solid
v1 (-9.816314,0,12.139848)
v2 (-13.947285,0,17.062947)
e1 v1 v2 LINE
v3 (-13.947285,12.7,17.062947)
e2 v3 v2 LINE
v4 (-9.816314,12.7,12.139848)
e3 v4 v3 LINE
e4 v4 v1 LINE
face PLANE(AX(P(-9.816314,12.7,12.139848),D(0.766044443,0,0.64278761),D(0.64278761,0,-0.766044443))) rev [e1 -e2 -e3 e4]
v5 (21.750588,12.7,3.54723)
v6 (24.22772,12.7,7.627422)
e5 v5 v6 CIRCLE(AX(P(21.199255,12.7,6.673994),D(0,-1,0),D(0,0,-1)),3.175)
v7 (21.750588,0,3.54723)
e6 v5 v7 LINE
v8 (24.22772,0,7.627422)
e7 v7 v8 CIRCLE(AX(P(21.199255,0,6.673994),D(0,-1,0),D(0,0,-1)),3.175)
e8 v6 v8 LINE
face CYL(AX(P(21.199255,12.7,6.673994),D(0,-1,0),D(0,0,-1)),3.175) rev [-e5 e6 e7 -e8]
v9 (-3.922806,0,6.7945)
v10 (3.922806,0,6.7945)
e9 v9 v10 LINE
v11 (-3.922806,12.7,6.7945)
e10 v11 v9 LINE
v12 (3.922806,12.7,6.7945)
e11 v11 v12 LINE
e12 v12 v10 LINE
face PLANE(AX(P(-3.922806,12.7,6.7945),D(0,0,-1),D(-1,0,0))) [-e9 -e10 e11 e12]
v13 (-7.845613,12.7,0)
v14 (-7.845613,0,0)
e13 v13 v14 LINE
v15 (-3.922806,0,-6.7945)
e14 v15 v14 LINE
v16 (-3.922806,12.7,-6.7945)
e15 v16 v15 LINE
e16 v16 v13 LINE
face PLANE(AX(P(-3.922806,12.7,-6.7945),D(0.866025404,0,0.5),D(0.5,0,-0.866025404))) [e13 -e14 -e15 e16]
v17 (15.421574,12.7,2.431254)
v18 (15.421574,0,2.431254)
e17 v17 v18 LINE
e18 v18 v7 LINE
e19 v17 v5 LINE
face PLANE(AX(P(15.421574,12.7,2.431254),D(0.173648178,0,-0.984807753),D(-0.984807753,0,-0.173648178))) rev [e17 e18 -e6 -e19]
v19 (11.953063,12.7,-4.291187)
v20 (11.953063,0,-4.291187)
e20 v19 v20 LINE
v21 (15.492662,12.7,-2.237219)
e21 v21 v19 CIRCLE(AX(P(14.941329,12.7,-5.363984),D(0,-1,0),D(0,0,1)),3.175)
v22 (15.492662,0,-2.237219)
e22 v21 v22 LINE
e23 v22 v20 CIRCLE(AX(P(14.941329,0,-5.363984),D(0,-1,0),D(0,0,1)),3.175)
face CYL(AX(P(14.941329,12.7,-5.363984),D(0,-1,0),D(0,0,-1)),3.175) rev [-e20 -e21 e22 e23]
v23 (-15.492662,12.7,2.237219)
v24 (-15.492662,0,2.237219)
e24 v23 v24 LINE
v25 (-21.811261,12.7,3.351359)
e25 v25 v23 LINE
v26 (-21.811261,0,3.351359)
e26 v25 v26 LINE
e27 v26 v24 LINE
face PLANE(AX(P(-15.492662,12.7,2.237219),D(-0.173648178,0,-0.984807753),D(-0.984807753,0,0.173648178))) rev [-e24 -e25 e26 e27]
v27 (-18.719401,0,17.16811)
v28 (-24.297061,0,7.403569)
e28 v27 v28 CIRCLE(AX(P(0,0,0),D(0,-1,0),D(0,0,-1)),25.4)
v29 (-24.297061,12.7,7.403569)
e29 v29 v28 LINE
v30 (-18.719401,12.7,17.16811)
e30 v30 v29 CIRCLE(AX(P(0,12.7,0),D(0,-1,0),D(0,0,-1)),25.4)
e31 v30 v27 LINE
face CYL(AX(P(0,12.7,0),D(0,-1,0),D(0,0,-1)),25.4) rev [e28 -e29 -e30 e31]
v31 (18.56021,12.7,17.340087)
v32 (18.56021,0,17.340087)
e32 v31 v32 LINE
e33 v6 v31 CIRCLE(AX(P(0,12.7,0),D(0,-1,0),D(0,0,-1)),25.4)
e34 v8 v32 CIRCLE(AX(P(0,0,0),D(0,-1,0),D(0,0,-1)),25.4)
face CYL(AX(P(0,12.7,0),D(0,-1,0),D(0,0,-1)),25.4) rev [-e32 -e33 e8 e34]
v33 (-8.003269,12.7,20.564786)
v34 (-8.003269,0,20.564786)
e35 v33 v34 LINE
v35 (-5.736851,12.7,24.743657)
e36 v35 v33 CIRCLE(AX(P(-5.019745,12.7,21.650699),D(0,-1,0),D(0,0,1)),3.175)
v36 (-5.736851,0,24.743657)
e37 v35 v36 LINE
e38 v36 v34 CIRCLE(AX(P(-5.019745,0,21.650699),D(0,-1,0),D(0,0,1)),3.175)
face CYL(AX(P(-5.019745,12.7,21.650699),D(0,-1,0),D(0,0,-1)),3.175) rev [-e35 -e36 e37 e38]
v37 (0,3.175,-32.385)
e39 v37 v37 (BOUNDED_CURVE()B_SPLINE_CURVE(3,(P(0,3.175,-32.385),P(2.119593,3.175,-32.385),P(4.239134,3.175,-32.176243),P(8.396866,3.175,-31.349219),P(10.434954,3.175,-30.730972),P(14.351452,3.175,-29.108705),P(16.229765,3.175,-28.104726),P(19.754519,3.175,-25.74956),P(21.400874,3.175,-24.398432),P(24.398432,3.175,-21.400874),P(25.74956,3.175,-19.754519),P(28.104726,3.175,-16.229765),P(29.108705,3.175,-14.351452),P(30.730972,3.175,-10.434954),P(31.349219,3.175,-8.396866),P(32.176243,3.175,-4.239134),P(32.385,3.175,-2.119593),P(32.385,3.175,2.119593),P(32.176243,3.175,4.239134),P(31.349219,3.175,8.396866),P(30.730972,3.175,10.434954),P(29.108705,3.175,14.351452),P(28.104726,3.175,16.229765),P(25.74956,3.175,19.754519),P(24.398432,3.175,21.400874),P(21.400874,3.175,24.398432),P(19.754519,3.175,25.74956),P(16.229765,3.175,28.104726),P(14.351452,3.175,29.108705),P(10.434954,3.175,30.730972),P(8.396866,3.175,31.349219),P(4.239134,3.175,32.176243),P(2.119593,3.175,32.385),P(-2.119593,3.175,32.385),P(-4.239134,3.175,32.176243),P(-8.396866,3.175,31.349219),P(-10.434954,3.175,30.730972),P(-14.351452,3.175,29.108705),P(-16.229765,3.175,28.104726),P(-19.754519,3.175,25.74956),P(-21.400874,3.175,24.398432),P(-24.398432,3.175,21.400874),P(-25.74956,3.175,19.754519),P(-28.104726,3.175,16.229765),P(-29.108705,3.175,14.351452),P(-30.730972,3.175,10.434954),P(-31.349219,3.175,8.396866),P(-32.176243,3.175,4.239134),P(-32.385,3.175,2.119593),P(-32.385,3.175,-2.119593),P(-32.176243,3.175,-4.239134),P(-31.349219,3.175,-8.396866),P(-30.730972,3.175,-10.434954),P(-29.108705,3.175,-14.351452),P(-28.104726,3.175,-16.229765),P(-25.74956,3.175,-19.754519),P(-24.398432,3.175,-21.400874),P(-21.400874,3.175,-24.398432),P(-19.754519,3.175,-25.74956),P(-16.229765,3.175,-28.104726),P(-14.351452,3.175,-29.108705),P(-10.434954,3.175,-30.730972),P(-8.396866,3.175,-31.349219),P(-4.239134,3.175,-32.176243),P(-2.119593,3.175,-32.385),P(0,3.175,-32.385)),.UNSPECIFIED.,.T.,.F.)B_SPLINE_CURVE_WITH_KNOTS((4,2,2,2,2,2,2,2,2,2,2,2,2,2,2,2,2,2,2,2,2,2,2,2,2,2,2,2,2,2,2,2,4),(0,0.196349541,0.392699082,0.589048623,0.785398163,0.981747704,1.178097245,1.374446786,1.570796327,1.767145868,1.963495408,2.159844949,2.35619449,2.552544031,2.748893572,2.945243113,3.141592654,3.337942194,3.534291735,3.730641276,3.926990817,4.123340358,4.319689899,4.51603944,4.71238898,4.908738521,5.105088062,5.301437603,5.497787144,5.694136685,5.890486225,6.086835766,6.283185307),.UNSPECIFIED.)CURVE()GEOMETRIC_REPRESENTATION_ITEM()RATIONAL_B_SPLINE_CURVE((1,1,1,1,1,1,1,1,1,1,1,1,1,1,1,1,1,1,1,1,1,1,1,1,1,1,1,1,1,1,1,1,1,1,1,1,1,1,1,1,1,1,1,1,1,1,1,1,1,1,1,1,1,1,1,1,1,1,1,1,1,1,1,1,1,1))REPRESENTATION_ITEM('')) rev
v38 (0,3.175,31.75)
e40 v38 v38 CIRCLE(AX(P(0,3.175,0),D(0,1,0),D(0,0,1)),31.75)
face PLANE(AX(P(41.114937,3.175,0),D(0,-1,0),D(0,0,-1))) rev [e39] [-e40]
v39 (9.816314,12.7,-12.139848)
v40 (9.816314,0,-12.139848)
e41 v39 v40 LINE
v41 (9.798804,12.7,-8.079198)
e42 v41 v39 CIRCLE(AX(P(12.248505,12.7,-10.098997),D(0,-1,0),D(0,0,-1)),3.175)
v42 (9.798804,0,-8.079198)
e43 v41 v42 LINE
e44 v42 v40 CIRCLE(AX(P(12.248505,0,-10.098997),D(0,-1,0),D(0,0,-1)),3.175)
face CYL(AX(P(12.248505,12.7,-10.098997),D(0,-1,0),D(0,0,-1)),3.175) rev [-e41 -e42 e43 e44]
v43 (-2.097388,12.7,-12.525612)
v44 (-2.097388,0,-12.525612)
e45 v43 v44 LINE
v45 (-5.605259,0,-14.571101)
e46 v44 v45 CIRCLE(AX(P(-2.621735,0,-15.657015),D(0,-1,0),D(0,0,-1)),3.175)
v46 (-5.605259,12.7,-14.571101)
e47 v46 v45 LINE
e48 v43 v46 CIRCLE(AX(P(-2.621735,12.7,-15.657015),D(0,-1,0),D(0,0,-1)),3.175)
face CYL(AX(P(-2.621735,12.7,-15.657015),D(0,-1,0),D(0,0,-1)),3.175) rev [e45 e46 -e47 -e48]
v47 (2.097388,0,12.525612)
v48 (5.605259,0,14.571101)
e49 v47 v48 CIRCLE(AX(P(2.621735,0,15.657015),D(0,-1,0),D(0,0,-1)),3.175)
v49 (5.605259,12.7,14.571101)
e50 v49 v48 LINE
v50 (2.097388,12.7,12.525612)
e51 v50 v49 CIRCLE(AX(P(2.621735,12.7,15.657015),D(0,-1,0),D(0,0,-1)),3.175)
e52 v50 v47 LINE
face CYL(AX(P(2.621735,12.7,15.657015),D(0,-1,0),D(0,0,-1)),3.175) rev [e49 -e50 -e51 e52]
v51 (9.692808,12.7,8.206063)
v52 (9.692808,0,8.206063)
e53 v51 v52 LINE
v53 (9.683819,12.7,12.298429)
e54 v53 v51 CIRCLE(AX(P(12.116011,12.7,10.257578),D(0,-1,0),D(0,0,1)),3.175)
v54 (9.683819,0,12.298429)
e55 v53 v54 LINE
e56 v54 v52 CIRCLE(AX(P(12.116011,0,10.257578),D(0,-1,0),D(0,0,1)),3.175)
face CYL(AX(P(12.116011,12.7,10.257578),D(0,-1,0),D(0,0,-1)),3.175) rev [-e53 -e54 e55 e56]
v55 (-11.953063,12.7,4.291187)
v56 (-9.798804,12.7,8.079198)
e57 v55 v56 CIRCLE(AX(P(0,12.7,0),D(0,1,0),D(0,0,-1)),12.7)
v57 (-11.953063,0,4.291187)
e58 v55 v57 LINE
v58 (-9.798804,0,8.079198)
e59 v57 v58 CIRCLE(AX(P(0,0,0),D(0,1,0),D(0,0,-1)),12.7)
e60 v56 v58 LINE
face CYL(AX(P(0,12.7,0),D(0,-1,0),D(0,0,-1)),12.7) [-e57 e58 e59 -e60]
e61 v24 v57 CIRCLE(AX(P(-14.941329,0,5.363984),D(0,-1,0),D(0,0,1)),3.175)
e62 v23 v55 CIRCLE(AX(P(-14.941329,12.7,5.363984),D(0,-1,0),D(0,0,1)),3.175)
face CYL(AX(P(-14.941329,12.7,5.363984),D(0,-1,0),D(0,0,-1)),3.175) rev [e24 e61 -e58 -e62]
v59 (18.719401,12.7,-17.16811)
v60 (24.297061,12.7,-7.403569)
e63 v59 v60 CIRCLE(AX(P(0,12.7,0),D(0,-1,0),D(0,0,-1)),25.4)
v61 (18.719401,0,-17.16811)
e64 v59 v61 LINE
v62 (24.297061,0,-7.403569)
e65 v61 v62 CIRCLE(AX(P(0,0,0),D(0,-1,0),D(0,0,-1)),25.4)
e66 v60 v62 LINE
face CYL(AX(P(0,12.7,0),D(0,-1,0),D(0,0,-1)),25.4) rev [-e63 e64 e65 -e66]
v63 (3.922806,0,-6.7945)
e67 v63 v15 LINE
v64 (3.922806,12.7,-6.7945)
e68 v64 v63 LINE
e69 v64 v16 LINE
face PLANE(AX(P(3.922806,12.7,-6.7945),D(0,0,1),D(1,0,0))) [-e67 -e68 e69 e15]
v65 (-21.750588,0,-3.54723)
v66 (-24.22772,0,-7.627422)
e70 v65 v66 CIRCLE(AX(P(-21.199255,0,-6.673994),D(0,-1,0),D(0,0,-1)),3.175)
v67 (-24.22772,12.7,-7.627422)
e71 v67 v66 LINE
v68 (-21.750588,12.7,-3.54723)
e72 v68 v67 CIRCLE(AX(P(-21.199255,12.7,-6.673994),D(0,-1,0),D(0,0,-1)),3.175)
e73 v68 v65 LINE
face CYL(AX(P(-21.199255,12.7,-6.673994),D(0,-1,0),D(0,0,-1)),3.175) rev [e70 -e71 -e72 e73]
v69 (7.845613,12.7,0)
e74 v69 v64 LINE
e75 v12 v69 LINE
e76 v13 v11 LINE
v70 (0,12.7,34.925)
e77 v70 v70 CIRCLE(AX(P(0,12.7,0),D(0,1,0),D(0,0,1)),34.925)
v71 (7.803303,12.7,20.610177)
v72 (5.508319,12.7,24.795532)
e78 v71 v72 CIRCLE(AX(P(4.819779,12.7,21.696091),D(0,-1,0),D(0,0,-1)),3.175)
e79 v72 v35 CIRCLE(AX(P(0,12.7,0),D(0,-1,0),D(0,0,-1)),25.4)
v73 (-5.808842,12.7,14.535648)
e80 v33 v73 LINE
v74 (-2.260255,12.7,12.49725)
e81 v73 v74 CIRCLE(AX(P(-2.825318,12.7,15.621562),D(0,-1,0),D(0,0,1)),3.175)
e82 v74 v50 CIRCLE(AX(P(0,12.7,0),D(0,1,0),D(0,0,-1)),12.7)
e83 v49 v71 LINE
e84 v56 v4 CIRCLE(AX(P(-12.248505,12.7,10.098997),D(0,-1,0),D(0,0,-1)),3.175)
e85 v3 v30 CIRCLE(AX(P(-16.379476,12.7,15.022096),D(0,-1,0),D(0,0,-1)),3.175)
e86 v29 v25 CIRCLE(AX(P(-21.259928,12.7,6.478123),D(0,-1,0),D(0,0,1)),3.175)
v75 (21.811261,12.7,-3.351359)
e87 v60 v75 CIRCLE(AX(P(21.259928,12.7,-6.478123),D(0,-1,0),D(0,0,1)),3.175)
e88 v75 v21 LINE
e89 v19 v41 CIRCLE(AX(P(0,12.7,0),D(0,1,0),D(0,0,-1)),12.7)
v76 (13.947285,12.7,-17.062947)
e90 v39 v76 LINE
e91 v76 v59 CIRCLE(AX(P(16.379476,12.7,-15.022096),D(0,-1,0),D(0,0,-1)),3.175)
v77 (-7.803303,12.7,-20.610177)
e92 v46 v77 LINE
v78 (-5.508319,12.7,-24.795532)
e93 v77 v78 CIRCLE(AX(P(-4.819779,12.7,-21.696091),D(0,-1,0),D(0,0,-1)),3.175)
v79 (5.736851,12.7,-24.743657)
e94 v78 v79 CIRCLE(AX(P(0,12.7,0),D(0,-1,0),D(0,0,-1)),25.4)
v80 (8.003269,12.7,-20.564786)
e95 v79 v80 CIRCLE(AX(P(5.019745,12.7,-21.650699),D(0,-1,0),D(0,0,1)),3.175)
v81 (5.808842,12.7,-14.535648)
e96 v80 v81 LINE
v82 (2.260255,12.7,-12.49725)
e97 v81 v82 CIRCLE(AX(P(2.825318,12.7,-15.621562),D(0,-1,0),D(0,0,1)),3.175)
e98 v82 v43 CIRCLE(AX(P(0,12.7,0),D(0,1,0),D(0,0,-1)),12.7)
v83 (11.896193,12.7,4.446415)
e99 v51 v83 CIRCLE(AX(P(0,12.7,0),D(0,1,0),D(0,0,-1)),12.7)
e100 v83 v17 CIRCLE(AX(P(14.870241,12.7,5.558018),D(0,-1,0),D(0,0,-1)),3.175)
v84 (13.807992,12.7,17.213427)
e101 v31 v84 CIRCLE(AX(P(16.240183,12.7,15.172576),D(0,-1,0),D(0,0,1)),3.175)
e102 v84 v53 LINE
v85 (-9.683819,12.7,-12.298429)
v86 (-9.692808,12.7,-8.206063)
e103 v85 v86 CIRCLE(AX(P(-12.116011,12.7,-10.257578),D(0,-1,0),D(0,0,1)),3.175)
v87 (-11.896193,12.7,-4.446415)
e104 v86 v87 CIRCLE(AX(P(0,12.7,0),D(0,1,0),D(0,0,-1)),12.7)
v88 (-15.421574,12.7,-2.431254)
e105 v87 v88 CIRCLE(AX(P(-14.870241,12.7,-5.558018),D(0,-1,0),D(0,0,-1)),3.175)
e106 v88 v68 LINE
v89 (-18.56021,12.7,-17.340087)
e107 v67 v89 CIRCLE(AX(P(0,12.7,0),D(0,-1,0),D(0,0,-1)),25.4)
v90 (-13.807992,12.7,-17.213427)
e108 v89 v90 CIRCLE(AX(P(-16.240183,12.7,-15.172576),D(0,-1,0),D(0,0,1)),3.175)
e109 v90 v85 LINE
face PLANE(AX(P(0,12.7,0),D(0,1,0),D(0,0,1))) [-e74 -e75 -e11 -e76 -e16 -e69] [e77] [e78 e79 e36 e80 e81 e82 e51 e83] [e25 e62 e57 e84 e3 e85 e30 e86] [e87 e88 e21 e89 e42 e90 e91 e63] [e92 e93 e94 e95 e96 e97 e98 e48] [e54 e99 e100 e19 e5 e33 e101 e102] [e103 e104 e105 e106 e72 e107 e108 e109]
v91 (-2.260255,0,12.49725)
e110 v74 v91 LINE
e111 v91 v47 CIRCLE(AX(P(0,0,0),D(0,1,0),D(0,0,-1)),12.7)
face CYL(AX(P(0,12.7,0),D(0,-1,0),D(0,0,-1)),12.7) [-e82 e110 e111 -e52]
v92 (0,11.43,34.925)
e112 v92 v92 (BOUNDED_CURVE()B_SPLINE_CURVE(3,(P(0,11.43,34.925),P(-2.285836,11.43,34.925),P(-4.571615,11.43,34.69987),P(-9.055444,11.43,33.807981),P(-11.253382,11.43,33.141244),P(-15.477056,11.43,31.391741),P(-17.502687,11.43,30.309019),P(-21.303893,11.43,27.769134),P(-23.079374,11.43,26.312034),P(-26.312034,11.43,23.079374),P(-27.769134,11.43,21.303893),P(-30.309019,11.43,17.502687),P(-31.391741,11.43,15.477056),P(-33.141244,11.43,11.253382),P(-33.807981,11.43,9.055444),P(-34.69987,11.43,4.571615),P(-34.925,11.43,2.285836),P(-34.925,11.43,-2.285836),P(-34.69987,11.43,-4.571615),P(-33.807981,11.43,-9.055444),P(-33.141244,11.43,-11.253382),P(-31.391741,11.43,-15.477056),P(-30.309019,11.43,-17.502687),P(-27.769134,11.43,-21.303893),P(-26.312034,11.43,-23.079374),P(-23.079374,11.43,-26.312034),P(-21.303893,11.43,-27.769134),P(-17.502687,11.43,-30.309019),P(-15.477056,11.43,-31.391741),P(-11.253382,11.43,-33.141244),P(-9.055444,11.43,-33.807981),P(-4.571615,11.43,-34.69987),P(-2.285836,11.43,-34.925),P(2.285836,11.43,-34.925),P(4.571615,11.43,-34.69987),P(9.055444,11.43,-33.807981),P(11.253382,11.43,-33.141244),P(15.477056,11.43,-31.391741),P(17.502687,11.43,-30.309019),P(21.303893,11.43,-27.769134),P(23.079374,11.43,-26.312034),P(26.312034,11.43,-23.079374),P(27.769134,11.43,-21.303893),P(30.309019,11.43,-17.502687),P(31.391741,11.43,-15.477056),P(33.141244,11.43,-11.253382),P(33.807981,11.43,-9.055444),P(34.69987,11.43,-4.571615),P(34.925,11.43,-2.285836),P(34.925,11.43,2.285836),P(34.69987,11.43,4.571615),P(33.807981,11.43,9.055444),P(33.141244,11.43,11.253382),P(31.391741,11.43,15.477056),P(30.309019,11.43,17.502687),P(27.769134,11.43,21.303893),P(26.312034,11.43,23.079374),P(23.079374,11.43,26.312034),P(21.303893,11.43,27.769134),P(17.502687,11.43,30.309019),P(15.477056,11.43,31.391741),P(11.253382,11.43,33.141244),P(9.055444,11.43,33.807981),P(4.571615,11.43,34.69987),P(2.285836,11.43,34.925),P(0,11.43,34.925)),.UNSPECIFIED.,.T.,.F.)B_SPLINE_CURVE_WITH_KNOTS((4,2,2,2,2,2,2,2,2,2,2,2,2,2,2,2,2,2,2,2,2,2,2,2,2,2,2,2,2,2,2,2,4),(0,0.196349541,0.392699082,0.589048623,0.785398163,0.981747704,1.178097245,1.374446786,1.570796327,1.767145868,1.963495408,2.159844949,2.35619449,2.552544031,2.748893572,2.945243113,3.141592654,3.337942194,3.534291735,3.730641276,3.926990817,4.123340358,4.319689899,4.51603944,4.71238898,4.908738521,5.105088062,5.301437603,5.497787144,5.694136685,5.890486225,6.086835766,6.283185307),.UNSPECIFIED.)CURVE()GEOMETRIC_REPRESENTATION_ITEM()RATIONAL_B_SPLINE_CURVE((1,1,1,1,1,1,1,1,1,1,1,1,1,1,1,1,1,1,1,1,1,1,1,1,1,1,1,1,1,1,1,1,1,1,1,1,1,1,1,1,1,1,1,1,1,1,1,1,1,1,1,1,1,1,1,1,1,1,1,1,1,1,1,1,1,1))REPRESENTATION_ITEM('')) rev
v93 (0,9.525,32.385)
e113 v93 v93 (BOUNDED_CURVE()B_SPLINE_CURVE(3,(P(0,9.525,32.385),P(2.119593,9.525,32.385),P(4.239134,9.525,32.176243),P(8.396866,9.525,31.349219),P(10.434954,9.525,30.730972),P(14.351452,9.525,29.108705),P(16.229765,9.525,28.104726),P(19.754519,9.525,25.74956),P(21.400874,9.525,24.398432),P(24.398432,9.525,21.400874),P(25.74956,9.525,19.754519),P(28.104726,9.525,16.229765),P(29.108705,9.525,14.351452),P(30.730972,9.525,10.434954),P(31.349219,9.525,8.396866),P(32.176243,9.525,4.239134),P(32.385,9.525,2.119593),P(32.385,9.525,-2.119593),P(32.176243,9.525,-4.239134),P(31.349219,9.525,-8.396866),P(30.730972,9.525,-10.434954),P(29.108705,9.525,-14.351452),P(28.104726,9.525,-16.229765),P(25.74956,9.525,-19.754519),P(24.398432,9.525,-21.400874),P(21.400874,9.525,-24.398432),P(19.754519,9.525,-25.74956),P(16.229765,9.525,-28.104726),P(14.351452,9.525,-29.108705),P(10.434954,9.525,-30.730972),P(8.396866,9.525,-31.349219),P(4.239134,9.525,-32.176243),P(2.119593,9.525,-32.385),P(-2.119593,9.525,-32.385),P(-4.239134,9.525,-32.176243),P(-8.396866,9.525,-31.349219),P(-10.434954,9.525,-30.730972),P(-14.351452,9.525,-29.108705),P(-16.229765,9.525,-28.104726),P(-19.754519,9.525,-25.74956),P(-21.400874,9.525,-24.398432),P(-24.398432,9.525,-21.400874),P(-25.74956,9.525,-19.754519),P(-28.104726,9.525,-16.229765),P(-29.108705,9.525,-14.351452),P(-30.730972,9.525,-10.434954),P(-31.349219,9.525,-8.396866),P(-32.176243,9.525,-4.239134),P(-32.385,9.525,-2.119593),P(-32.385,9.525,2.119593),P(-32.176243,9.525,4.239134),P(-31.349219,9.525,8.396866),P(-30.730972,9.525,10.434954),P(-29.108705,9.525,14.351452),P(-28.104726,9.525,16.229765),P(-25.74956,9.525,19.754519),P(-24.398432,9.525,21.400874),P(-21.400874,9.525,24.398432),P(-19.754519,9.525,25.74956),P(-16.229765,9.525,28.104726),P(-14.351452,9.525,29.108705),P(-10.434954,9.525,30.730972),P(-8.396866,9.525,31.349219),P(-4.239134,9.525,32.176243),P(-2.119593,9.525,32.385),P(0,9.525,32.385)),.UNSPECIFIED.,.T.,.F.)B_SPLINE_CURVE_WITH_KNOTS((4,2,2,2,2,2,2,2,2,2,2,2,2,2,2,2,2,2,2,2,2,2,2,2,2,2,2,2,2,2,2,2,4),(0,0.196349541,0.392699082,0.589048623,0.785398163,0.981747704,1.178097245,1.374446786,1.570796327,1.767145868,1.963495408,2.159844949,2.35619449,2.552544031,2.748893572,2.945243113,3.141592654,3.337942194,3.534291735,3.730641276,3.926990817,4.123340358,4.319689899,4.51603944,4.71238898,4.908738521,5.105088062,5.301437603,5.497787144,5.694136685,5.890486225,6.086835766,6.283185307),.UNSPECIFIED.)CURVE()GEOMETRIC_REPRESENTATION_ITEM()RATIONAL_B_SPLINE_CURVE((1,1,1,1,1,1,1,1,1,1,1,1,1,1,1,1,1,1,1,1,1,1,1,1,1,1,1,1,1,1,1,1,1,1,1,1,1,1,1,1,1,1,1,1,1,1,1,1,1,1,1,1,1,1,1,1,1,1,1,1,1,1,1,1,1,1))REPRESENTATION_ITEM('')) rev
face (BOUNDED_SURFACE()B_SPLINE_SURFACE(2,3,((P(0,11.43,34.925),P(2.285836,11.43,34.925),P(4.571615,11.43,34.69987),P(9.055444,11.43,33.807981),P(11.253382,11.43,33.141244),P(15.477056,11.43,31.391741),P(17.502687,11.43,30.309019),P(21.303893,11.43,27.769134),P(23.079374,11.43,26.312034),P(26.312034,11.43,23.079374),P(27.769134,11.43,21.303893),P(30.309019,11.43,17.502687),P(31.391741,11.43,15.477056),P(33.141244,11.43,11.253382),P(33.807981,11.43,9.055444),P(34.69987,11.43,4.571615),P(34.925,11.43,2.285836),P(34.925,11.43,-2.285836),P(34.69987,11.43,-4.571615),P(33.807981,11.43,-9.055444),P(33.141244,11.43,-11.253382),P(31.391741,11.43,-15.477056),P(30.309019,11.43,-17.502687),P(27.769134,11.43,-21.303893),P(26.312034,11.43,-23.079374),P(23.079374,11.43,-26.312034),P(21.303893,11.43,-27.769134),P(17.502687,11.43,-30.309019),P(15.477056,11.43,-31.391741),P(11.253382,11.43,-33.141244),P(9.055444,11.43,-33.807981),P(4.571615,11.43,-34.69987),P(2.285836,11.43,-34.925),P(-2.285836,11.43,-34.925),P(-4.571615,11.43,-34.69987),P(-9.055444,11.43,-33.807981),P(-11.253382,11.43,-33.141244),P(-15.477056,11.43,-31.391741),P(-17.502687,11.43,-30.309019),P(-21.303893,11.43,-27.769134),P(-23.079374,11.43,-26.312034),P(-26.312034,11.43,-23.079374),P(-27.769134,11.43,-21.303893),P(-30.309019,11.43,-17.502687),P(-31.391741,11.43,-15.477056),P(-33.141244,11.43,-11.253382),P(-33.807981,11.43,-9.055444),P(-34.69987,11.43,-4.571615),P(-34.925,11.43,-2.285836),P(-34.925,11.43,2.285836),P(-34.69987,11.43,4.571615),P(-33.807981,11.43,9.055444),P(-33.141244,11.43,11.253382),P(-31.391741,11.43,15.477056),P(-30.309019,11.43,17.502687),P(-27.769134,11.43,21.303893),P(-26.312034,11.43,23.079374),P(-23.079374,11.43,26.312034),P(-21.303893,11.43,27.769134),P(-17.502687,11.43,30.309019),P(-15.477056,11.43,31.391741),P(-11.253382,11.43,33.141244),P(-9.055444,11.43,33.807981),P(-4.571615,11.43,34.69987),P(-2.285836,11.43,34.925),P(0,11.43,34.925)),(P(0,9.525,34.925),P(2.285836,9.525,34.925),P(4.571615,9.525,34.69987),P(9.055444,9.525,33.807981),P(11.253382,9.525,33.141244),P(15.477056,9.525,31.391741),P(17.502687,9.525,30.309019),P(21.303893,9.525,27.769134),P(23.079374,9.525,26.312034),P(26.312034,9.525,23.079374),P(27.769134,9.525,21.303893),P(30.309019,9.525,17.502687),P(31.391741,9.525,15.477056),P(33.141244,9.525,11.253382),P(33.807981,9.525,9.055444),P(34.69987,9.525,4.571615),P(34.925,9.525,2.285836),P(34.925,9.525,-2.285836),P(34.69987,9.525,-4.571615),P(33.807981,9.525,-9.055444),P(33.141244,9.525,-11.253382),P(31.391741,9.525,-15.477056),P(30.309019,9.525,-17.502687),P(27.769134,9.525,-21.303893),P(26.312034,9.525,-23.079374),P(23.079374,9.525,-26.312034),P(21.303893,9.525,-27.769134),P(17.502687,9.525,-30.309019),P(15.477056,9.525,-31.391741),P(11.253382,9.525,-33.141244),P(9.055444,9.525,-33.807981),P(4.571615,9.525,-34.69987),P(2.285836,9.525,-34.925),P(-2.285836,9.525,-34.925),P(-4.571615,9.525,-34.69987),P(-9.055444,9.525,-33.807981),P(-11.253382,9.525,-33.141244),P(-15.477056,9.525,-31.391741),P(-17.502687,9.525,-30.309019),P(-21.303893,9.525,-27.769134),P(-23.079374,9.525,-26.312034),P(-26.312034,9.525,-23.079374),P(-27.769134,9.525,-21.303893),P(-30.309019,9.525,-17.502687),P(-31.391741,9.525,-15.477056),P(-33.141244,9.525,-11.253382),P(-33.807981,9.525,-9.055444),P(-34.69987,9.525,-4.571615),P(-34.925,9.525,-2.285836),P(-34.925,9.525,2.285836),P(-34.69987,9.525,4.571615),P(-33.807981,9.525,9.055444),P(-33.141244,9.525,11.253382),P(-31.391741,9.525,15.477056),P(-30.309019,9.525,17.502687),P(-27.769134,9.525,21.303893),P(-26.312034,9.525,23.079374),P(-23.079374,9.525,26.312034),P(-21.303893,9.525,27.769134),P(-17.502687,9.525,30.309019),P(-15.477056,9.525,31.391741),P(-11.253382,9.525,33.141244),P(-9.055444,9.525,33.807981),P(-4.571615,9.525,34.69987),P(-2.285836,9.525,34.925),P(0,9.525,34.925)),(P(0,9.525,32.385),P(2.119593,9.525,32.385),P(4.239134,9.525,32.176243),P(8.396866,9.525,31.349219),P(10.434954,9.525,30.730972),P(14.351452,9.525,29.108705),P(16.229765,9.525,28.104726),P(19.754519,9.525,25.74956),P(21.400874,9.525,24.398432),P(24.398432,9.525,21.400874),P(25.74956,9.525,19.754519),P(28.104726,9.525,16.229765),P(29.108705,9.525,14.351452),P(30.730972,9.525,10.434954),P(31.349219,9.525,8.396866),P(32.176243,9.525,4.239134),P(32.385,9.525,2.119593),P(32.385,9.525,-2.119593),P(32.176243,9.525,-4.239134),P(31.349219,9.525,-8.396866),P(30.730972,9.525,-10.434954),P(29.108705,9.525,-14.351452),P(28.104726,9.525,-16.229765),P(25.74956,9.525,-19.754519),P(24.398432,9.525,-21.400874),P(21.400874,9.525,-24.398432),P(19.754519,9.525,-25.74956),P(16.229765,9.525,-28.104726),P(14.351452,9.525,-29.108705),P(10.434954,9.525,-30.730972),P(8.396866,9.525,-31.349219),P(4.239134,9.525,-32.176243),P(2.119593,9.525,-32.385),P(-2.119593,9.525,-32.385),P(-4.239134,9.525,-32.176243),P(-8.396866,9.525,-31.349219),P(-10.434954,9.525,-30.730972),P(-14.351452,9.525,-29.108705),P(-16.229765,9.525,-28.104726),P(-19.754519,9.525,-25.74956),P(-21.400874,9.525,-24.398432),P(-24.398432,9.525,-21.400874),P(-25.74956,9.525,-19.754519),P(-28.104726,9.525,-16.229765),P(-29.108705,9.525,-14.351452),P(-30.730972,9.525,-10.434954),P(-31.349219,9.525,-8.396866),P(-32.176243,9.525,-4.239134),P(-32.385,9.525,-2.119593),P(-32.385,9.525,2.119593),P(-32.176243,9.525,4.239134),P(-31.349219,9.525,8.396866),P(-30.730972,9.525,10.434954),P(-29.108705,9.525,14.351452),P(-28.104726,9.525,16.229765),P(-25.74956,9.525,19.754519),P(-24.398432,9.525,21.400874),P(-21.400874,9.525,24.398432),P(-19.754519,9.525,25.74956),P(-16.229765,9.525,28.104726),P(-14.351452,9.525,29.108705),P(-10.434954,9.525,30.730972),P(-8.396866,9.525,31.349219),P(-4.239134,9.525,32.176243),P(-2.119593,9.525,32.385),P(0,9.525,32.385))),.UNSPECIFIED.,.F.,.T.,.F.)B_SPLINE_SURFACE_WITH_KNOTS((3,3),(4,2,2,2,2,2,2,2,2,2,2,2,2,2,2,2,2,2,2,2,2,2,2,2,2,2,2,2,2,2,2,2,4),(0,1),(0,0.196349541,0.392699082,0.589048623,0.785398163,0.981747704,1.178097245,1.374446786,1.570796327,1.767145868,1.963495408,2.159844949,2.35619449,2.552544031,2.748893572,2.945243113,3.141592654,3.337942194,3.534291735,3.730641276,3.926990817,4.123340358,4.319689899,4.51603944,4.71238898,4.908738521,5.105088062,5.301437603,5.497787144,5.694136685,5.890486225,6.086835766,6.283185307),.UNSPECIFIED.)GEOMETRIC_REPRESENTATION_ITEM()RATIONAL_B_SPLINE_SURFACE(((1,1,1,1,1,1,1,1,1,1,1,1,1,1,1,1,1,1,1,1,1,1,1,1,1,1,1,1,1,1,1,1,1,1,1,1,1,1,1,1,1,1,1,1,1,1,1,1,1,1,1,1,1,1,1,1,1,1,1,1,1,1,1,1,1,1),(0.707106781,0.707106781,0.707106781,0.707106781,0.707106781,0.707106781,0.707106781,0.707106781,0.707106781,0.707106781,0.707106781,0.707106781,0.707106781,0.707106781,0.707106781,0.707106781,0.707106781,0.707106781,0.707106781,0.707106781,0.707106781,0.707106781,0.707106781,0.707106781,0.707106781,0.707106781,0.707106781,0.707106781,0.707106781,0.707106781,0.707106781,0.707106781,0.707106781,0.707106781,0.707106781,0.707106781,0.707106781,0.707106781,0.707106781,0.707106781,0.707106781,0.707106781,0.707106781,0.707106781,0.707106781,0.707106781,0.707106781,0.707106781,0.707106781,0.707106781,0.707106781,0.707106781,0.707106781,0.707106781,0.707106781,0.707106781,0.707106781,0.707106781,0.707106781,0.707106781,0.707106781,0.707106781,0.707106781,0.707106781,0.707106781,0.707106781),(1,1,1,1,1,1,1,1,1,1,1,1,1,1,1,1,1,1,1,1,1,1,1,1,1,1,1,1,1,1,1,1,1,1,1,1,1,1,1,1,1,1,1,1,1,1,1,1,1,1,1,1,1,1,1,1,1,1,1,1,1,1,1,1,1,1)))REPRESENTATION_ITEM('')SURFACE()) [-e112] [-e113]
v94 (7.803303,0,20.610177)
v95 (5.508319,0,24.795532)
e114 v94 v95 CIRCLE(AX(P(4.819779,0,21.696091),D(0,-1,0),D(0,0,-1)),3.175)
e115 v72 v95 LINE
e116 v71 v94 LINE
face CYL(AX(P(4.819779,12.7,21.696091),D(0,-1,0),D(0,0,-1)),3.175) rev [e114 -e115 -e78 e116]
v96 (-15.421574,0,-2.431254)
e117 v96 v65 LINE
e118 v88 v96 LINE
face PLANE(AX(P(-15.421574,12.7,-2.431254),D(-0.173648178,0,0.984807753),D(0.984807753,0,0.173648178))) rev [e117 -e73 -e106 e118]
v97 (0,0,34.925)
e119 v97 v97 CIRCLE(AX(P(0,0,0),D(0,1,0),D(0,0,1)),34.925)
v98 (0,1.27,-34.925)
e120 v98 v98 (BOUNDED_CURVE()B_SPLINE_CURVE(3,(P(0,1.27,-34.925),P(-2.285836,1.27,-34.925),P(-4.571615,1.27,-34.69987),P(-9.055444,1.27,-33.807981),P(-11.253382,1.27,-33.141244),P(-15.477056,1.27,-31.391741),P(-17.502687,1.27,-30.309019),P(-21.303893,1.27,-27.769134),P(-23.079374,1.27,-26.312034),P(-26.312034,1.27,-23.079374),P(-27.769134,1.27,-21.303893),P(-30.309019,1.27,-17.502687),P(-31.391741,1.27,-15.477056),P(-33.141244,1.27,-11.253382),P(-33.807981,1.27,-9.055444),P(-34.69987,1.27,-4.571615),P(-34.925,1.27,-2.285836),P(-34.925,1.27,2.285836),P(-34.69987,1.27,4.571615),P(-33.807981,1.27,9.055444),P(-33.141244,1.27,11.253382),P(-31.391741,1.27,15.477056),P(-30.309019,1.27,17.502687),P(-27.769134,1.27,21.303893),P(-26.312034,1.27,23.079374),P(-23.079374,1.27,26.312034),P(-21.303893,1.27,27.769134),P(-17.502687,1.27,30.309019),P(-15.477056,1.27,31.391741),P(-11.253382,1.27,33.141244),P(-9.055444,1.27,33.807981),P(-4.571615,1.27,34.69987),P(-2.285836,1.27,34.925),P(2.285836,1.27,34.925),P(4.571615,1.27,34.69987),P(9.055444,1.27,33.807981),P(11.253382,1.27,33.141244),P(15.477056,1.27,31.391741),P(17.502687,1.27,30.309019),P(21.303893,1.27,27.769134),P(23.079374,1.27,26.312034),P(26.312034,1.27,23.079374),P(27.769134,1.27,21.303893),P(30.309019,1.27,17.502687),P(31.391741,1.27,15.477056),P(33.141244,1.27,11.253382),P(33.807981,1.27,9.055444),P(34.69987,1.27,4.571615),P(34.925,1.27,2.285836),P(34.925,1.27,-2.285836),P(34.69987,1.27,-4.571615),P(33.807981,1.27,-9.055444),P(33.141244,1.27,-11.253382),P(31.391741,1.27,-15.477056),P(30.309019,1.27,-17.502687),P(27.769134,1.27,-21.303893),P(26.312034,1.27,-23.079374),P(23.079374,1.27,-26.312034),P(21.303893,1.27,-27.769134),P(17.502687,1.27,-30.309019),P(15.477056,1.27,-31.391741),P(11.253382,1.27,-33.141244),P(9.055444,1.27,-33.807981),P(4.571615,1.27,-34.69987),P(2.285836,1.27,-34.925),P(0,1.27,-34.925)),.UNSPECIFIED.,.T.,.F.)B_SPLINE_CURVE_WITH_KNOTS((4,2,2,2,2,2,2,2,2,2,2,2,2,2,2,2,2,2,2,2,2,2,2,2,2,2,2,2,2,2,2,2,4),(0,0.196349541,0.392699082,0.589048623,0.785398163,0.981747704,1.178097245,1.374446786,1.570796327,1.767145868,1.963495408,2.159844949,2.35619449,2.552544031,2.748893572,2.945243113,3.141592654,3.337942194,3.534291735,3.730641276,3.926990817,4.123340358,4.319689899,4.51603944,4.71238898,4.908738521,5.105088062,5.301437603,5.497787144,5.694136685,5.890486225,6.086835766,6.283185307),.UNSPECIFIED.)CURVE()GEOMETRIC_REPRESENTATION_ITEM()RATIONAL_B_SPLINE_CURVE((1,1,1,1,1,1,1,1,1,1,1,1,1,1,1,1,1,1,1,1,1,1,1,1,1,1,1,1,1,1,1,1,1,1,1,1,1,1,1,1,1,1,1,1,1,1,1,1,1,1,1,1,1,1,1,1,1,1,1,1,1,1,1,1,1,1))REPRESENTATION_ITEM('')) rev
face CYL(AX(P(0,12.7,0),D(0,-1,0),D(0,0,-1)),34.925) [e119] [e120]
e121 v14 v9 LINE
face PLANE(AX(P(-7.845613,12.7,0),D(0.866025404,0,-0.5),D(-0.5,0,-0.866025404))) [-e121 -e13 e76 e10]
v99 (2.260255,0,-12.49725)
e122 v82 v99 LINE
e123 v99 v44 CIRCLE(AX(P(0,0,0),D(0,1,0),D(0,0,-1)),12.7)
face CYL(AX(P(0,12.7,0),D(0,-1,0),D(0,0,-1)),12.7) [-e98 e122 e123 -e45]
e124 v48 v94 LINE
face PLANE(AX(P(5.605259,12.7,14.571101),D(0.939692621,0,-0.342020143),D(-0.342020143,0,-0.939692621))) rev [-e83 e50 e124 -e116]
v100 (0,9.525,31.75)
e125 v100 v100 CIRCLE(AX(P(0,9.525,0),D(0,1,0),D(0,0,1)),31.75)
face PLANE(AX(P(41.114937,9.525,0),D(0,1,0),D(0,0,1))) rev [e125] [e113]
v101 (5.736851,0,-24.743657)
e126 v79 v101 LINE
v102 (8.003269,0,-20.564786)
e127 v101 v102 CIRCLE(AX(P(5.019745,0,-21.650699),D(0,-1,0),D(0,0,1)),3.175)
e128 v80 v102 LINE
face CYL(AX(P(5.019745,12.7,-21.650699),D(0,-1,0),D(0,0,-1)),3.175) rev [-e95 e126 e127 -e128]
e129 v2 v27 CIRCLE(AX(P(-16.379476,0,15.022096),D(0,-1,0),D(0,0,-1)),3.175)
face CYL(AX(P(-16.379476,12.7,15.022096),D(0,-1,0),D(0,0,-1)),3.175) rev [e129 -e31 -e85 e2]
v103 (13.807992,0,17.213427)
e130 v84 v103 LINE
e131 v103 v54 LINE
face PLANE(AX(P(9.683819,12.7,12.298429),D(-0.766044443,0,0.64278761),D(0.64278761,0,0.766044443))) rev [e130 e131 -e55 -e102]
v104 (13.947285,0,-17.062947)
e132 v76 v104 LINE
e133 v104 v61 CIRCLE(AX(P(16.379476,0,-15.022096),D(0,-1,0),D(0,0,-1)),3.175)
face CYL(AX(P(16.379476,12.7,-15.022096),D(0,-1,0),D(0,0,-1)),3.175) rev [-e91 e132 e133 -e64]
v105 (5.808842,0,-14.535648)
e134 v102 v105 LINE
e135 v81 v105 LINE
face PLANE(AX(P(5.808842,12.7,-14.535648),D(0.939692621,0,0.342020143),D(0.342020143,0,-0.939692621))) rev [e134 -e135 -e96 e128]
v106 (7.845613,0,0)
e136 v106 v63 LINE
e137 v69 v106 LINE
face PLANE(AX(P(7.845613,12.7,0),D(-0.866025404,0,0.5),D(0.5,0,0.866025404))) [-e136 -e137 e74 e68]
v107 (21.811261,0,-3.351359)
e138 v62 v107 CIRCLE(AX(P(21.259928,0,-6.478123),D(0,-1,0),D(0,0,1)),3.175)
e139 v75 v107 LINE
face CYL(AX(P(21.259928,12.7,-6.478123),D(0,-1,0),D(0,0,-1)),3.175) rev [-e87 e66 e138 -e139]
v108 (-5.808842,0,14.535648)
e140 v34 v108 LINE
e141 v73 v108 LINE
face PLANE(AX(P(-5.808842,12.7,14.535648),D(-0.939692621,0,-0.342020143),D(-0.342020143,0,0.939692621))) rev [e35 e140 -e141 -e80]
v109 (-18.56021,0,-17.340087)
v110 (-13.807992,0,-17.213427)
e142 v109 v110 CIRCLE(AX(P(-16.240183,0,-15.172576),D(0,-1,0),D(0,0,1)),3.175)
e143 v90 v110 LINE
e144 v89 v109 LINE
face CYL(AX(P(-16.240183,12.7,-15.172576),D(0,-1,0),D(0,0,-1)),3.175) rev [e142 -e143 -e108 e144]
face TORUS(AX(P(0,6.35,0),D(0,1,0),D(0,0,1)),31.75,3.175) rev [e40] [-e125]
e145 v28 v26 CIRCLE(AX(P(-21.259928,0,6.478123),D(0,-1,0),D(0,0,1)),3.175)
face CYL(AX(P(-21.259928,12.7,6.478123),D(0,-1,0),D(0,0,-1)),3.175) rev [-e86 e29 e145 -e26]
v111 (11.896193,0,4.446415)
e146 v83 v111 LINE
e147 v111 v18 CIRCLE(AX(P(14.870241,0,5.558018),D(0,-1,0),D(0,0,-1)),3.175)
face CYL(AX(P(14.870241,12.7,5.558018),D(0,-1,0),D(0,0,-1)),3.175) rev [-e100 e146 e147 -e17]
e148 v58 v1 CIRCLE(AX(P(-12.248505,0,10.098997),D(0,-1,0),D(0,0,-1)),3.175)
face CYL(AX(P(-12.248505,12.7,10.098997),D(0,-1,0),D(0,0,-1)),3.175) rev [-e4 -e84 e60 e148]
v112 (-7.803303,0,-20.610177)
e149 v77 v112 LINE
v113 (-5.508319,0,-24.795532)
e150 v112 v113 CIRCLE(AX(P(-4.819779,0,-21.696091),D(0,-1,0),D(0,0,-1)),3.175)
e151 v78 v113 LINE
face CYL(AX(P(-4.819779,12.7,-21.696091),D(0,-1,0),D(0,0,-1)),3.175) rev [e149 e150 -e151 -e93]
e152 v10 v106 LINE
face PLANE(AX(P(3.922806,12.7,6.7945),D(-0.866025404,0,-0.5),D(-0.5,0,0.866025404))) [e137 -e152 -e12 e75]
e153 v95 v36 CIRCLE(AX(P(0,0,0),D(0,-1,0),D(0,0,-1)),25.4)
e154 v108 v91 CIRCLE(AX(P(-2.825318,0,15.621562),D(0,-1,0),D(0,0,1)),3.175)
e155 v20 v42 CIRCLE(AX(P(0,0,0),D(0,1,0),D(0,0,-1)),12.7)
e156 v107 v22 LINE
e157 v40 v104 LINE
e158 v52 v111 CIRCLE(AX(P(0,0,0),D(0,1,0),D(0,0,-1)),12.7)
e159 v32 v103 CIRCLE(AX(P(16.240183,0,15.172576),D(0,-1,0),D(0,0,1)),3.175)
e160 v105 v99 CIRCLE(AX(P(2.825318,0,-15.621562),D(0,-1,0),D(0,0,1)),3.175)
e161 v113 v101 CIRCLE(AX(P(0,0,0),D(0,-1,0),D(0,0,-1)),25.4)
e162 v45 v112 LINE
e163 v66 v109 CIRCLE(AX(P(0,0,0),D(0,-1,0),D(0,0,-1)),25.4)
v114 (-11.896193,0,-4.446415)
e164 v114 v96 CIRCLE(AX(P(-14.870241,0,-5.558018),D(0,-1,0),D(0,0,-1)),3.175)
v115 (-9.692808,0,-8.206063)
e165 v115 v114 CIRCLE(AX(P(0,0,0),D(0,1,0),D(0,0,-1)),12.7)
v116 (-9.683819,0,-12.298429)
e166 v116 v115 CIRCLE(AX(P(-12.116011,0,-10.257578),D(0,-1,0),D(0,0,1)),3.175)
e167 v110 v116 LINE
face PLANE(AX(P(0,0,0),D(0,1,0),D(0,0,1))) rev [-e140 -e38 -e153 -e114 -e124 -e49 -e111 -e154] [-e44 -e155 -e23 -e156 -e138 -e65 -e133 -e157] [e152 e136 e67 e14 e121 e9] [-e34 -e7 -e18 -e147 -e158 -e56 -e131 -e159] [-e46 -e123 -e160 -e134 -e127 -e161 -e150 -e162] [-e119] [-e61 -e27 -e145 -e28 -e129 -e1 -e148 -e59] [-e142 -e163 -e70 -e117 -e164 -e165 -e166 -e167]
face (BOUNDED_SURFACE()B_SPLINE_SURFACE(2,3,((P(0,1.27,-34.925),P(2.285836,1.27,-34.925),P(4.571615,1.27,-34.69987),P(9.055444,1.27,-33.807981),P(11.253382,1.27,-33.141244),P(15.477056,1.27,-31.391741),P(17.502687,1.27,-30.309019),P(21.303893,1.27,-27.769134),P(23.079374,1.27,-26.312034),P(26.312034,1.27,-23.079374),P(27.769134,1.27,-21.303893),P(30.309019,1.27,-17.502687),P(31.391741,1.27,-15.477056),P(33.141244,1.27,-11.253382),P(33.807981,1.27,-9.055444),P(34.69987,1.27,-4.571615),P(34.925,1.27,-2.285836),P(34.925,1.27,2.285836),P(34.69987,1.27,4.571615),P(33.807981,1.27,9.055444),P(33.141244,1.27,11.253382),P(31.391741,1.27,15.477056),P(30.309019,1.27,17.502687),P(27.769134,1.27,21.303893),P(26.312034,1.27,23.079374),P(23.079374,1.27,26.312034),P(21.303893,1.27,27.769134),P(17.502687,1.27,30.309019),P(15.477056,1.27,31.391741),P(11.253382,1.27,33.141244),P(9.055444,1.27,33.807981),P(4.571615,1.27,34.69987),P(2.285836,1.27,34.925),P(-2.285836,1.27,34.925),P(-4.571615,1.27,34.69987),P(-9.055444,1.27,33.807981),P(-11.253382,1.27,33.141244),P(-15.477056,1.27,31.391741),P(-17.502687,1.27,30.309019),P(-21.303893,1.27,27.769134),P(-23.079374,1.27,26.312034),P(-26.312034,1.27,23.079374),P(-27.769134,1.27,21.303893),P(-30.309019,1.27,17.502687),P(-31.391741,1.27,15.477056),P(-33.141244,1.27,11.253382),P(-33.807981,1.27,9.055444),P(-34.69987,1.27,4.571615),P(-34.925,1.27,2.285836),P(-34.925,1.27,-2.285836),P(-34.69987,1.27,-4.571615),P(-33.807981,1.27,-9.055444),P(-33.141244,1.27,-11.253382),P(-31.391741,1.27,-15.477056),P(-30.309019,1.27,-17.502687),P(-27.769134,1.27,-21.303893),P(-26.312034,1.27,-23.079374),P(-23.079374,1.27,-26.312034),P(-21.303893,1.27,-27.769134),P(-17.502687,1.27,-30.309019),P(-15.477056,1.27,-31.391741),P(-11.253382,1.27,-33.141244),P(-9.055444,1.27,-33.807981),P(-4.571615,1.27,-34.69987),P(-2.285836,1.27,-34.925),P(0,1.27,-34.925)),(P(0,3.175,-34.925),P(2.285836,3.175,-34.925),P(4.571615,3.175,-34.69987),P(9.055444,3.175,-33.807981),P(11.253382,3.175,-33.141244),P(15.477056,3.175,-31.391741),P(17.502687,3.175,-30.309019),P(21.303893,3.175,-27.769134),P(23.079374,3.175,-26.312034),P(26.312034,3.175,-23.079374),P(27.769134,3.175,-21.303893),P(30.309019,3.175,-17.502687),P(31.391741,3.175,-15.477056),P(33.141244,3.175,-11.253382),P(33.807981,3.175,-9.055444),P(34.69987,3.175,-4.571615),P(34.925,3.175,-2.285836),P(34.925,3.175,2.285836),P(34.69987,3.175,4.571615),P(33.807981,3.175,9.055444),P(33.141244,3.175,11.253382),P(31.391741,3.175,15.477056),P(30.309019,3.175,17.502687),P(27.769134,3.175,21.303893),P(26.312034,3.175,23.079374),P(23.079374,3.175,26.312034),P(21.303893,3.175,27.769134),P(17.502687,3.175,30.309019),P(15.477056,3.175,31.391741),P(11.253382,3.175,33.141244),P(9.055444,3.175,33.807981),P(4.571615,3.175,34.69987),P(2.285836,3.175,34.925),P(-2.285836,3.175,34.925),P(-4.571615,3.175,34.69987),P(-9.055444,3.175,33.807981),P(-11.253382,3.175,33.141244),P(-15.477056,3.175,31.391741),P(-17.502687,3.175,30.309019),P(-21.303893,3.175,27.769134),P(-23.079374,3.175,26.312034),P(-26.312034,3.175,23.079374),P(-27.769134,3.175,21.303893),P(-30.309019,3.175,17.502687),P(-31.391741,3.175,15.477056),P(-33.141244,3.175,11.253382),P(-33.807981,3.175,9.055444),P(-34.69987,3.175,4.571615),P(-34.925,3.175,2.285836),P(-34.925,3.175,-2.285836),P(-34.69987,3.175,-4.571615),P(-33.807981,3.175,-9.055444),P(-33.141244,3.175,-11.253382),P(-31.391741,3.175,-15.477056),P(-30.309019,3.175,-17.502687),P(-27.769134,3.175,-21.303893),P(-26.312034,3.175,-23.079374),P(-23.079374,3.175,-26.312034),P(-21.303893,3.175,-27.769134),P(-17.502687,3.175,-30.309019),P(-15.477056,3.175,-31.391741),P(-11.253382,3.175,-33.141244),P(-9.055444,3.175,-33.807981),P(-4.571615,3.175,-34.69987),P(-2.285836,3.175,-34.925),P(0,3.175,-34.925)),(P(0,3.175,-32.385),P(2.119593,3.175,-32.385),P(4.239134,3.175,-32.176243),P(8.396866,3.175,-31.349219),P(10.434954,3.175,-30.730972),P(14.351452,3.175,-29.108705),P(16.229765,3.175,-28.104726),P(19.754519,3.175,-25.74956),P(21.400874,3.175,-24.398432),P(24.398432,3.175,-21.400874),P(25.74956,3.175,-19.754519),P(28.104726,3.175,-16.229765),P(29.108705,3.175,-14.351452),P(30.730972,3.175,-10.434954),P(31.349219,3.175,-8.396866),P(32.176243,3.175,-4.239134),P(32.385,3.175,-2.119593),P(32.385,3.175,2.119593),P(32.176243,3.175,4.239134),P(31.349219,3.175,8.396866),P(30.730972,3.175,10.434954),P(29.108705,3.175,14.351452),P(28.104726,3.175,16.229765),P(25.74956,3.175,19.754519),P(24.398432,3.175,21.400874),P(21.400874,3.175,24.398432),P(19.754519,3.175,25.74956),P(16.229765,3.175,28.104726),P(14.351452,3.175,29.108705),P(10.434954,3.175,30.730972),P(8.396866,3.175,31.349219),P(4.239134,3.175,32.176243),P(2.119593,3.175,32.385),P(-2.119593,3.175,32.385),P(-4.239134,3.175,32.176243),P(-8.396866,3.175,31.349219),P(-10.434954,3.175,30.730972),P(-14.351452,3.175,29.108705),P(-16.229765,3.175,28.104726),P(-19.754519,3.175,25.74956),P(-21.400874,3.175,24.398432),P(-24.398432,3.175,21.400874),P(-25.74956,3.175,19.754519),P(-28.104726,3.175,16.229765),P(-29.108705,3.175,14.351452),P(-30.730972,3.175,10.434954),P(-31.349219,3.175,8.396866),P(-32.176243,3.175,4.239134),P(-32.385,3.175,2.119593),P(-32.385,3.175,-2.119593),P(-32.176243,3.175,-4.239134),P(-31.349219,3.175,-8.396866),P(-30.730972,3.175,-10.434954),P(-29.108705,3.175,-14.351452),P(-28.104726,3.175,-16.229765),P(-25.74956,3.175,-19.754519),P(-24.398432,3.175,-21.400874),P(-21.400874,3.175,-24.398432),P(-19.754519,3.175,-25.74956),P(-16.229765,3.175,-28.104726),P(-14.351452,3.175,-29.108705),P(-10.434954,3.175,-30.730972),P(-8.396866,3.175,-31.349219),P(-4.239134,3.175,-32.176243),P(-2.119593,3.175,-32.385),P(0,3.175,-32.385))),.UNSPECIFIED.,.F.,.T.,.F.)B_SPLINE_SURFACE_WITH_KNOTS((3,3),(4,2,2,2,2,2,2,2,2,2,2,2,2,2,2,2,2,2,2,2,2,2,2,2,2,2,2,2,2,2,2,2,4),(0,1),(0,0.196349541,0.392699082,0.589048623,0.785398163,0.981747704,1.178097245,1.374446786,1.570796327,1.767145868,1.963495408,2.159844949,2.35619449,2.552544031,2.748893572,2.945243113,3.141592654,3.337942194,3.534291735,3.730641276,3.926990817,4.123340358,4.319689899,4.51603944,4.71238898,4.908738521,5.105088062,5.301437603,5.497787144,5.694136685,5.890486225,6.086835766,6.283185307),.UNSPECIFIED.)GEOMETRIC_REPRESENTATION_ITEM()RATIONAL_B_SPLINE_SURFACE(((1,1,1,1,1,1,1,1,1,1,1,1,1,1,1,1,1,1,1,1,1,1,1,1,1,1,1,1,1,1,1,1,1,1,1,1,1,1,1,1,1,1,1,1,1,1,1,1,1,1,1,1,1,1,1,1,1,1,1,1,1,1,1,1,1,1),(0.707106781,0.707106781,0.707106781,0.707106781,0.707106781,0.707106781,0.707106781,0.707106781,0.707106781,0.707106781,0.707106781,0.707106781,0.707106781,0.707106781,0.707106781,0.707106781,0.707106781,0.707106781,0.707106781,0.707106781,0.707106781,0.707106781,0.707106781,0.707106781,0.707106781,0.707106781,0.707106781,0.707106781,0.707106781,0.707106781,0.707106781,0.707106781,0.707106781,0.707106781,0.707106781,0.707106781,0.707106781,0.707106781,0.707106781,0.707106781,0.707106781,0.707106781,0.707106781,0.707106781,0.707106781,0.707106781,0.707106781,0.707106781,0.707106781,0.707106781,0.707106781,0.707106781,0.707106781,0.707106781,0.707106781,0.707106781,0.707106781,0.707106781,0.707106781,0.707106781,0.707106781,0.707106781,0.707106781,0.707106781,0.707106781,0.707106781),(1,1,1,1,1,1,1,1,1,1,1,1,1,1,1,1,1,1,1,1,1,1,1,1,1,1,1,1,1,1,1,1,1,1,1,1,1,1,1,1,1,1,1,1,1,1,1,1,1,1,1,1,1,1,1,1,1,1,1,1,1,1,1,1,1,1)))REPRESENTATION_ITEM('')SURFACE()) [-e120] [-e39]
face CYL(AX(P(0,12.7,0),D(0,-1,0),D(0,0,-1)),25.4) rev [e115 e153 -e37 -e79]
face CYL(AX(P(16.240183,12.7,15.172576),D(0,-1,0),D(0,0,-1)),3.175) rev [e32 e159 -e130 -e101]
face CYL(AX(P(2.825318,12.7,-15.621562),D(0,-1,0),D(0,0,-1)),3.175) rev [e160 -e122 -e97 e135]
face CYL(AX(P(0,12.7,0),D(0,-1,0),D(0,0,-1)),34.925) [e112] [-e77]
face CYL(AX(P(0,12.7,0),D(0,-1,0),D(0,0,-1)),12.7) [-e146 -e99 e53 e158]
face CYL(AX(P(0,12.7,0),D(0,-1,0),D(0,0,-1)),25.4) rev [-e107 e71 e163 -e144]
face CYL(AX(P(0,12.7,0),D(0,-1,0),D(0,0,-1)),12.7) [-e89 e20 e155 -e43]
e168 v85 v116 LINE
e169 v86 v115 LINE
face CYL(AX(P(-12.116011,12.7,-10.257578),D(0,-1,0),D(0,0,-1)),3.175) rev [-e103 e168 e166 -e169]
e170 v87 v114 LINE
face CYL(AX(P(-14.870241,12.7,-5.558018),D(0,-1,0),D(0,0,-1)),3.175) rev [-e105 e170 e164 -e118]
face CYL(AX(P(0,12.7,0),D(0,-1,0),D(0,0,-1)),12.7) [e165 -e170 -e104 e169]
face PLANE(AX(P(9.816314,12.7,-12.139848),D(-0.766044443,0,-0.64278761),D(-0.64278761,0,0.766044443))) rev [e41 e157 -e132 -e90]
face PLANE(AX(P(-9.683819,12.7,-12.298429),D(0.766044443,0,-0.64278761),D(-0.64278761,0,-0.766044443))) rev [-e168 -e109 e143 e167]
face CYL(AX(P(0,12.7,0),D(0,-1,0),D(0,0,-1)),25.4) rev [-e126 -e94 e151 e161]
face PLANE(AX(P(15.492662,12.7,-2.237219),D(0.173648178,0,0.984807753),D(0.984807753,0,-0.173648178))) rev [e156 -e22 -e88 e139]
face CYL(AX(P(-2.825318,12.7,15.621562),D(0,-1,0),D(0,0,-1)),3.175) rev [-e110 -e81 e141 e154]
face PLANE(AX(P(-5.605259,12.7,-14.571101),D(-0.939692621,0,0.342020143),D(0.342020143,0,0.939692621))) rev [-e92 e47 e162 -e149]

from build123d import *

# Parameters (mm, degrees)
SKETCH1_R           = 34.925
BOSS_EXTRUDE1_DEPTH = 12.7
CUT_EXTRUDE1_DEPTH  = 51.998051433
FILLET_R_SIZE       = 1.905
FILLET_R_SIZE_2     = 2.54


with BuildPart() as part:
    # Sketch1 → Boss-Extrude1 (new body)
    with BuildSketch(Plane(origin=(0, 0, 0), x_dir=(1, 0, 0), z_dir=(0, 1, 0))):
        with Locations(Location((0, 0, 0), (0, 0, 270))):
            Circle(SKETCH1_R)
        Polygon((7.845612808, 0), (3.922806404, 6.7945), (-3.922806404, 6.7945), (-7.845612808, 0), (-3.922806404, -6.7945), (3.922806404, -6.7945), align=None, mode=Mode.SUBTRACT)
    extrude(amount=BOSS_EXTRUDE1_DEPTH)

    # Sketch4 → Cut-Revolve1 (revolve, cut)
    with BuildSketch(Plane(origin=(-6.35, 6.35, 0), x_dir=(0, 1, 0), z_dir=(0, 0, -1)), mode=Mode.PRIVATE) as cut_revolve1_sk:
        with BuildLine():
            Line((3.175, 47.464936897), (3.175, 38.1))
            ThreePointArc((3.175, 38.1), (0, 34.925), (-3.175, 38.1))
            Line((-3.175, 38.1), (-3.175, 47.464936897))
            ThreePointArc((-3.175, 47.464936897), (0, 50.639936897), (3.175, 47.464936897))
        make_face()
    revolve(cut_revolve1_sk.sketch.rotate(Axis((0, 12.7, 0), (0, -1, 0)), 90), axis=Axis((0, 12.7, 0), (0, -1, 0)), mode=Mode.SUBTRACT)

    # Sketch5 → Cut-Extrude1 (cut, through all)
    with BuildSketch(Plane.XZ):
        with BuildLine():
            Line((5.605259426, 14.571101365), (7.803303133, 20.610176817))
            ThreePointArc((7.803303133, 20.610176817), (7.603717557, 23.222626542), (5.508318928, 24.795532311))
            ThreePointArc((5.508318928, 24.795532311), (-0.117173005, 25.399729733), (-5.736851109, 24.743656548))
            ThreePointArc((-5.736851109, 24.743656548), (-7.81069567, 23.164376391), (-8.003268791, 20.564785524))
            Line((-8.003268791, 20.564785524), (-5.808842244, 14.535648138))
            ThreePointArc((-5.808842244, 14.535648138), (-4.406774715, 12.868451088), (-2.260254538, 12.497249674))
            ThreePointArc((-2.260254538, 12.497249674), (-0.082658715, 12.699731003), (2.097388284, 12.525612256))
            ThreePointArc((2.097388284, 12.525612256), (4.221077189, 12.914255634), (5.605259426, 14.571101365))
        make_face()
        with BuildLine():
            Line((15.421573656, 2.431253625), (21.750588267, 3.547229662))
            ThreePointArc((21.750588267, 3.547229662), (23.913243307, 5.026300704), (24.227720346, 7.627422032))
            ThreePointArc((24.227720346, 7.627422032), (21.938224695, 12.801339665), (18.560209599, 17.340087072))
            ThreePointArc((18.560209599, 17.340087072), (16.155590582, 18.346449067), (13.807992292, 17.213426849))
            Line((13.807992292, 17.213426849), (9.683819426, 12.298429019))
            ThreePointArc((9.683819426, 12.298429019), (8.941018192, 10.250604396), (9.692808426, 8.206062686))
            ThreePointArc((9.692808426, 8.206062686), (10.956960312, 6.421450049), (11.896192554, 4.446414593))
            ThreePointArc((11.896192554, 4.446414593), (13.294612044, 2.80156774), (15.421573656, 2.431253625))
        make_face()
        with BuildLine():
            Line((9.81631423, -12.13984774), (13.947285134, -17.062947155))
            ThreePointArc((13.947285134, -17.062947155), (16.30952575, -18.196325838), (18.719401418, -17.168110279))
            ThreePointArc((18.719401418, -17.168110279), (22.0553977, -12.598390067), (24.297060707, -7.403569476))
            ThreePointArc((24.297060707, -7.403569476), (23.966286253, -4.817927324), (21.811261083, -3.351358676))
            Line((21.811261083, -3.351358676), (15.49266167, -2.237219119))
            ThreePointArc((15.49266167, -2.237219119), (13.347792907, -2.617846692), (11.953062965, -4.291186988))
            ThreePointArc((11.953062965, -4.291186988), (11.039619027, -6.278280954), (9.79880427, -8.079197663))
            ThreePointArc((9.79880427, -8.079197663), (9.073534855, -10.112687894), (9.81631423, -12.13984774))
        make_face()
        with BuildLine():
            Line((-5.605259426, -14.571101365), (-7.803303133, -20.610176817))
            ThreePointArc((-7.803303133, -20.610176817), (-7.603717557, -23.222626542), (-5.508318928, -24.795532311))
            ThreePointArc((-5.508318928, -24.795532311), (0.117173005, -25.399729733), (5.736851109, -24.743656548))
            ThreePointArc((5.736851109, -24.743656548), (7.81069567, -23.164376391), (8.003268791, -20.564785524))
            Line((8.003268791, -20.564785524), (5.808842244, -14.535648138))
            ThreePointArc((5.808842244, -14.535648138), (4.406774715, -12.868451088), (2.260254538, -12.497249674))
            ThreePointArc((2.260254538, -12.497249674), (0.082658715, -12.699731003), (-2.097388284, -12.525612256))
            ThreePointArc((-2.097388284, -12.525612256), (-4.221077189, -12.914255634), (-5.605259426, -14.571101365))
        make_face()
        with BuildLine():
            Line((-15.421573656, -2.431253625), (-21.750588267, -3.547229662))
            ThreePointArc((-21.750588267, -3.547229662), (-23.913243307, -5.026300704), (-24.227720346, -7.627422032))
            ThreePointArc((-24.227720346, -7.627422032), (-21.938224695, -12.801339665), (-18.560209599, -17.340087072))
            ThreePointArc((-18.560209599, -17.340087072), (-16.155590582, -18.346449067), (-13.807992292, -17.213426849))
            Line((-13.807992292, -17.213426849), (-9.683819426, -12.298429019))
            ThreePointArc((-9.683819426, -12.298429019), (-8.941018192, -10.250604396), (-9.692808426, -8.206062686))
            ThreePointArc((-9.692808426, -8.206062686), (-10.956960312, -6.421450049), (-11.896192554, -4.446414593))
            ThreePointArc((-11.896192554, -4.446414593), (-13.294612044, -2.80156774), (-15.421573656, -2.431253625))
        make_face()
        with BuildLine():
            Line((-9.81631423, 12.13984774), (-13.947285134, 17.062947155))
            ThreePointArc((-13.947285134, 17.062947155), (-16.30952575, 18.196325838), (-18.719401418, 17.168110279))
            ThreePointArc((-18.719401418, 17.168110279), (-22.0553977, 12.598390067), (-24.297060707, 7.403569476))
            ThreePointArc((-24.297060707, 7.403569476), (-23.966286253, 4.817927324), (-21.811261083, 3.351358676))
            Line((-21.811261083, 3.351358676), (-15.49266167, 2.237219119))
            ThreePointArc((-15.49266167, 2.237219119), (-13.347792907, 2.617846692), (-11.953062965, 4.291186988))
            ThreePointArc((-11.953062965, 4.291186988), (-11.039619027, 6.278280954), (-9.79880427, 8.079197663))
            ThreePointArc((-9.79880427, 8.079197663), (-9.073534855, 10.112687894), (-9.81631423, 12.13984774))
        make_face()
    extrude(amount=-CUT_EXTRUDE1_DEPTH, mode=Mode.SUBTRACT)

    # Fillet r
    # an asymmetric fillet: 2.54, 1.905 mm, written as the material it takes off along each edge
    with BuildSketch(Plane(origin=(0, 3.175, 0), x_dir=(0, 0, 1), z_dir=(1, 0, 0))) as fillet_r_piece_1:
        with BuildLine():
            Bezier((34.925, FILLET_R_SIZE), (34.925, 0), (34.925 - FILLET_R_SIZE_2, 0), weights=[1, 0.707106781, 1])
            Line((34.925 - FILLET_R_SIZE_2, 0), (34.925, 0))
            Line((34.925, 0), (34.925, FILLET_R_SIZE))
        make_face()
    revolve(axis=Axis((0, 3.175, 0), (0, -1, 0)), mode=Mode.SUBTRACT)
    with BuildSketch(Plane(origin=(0, 9.525, 0), x_dir=(0, 0, 1), z_dir=(1, 0, 0))) as fillet_r_piece_2:
        with BuildLine():
            Bezier((34.925 - FILLET_R_SIZE_2, 0), (34.925, 0), (34.925, -FILLET_R_SIZE), weights=[1, 0.707106781, 1])
            Line((34.925, -FILLET_R_SIZE), (34.925, 0))
            Line((34.925, 0), (34.925 - FILLET_R_SIZE_2, 0))
        make_face()
    revolve(axis=Axis((0, 9.525, 0), (0, -1, 0)), mode=Mode.SUBTRACT)


solid = part.part
